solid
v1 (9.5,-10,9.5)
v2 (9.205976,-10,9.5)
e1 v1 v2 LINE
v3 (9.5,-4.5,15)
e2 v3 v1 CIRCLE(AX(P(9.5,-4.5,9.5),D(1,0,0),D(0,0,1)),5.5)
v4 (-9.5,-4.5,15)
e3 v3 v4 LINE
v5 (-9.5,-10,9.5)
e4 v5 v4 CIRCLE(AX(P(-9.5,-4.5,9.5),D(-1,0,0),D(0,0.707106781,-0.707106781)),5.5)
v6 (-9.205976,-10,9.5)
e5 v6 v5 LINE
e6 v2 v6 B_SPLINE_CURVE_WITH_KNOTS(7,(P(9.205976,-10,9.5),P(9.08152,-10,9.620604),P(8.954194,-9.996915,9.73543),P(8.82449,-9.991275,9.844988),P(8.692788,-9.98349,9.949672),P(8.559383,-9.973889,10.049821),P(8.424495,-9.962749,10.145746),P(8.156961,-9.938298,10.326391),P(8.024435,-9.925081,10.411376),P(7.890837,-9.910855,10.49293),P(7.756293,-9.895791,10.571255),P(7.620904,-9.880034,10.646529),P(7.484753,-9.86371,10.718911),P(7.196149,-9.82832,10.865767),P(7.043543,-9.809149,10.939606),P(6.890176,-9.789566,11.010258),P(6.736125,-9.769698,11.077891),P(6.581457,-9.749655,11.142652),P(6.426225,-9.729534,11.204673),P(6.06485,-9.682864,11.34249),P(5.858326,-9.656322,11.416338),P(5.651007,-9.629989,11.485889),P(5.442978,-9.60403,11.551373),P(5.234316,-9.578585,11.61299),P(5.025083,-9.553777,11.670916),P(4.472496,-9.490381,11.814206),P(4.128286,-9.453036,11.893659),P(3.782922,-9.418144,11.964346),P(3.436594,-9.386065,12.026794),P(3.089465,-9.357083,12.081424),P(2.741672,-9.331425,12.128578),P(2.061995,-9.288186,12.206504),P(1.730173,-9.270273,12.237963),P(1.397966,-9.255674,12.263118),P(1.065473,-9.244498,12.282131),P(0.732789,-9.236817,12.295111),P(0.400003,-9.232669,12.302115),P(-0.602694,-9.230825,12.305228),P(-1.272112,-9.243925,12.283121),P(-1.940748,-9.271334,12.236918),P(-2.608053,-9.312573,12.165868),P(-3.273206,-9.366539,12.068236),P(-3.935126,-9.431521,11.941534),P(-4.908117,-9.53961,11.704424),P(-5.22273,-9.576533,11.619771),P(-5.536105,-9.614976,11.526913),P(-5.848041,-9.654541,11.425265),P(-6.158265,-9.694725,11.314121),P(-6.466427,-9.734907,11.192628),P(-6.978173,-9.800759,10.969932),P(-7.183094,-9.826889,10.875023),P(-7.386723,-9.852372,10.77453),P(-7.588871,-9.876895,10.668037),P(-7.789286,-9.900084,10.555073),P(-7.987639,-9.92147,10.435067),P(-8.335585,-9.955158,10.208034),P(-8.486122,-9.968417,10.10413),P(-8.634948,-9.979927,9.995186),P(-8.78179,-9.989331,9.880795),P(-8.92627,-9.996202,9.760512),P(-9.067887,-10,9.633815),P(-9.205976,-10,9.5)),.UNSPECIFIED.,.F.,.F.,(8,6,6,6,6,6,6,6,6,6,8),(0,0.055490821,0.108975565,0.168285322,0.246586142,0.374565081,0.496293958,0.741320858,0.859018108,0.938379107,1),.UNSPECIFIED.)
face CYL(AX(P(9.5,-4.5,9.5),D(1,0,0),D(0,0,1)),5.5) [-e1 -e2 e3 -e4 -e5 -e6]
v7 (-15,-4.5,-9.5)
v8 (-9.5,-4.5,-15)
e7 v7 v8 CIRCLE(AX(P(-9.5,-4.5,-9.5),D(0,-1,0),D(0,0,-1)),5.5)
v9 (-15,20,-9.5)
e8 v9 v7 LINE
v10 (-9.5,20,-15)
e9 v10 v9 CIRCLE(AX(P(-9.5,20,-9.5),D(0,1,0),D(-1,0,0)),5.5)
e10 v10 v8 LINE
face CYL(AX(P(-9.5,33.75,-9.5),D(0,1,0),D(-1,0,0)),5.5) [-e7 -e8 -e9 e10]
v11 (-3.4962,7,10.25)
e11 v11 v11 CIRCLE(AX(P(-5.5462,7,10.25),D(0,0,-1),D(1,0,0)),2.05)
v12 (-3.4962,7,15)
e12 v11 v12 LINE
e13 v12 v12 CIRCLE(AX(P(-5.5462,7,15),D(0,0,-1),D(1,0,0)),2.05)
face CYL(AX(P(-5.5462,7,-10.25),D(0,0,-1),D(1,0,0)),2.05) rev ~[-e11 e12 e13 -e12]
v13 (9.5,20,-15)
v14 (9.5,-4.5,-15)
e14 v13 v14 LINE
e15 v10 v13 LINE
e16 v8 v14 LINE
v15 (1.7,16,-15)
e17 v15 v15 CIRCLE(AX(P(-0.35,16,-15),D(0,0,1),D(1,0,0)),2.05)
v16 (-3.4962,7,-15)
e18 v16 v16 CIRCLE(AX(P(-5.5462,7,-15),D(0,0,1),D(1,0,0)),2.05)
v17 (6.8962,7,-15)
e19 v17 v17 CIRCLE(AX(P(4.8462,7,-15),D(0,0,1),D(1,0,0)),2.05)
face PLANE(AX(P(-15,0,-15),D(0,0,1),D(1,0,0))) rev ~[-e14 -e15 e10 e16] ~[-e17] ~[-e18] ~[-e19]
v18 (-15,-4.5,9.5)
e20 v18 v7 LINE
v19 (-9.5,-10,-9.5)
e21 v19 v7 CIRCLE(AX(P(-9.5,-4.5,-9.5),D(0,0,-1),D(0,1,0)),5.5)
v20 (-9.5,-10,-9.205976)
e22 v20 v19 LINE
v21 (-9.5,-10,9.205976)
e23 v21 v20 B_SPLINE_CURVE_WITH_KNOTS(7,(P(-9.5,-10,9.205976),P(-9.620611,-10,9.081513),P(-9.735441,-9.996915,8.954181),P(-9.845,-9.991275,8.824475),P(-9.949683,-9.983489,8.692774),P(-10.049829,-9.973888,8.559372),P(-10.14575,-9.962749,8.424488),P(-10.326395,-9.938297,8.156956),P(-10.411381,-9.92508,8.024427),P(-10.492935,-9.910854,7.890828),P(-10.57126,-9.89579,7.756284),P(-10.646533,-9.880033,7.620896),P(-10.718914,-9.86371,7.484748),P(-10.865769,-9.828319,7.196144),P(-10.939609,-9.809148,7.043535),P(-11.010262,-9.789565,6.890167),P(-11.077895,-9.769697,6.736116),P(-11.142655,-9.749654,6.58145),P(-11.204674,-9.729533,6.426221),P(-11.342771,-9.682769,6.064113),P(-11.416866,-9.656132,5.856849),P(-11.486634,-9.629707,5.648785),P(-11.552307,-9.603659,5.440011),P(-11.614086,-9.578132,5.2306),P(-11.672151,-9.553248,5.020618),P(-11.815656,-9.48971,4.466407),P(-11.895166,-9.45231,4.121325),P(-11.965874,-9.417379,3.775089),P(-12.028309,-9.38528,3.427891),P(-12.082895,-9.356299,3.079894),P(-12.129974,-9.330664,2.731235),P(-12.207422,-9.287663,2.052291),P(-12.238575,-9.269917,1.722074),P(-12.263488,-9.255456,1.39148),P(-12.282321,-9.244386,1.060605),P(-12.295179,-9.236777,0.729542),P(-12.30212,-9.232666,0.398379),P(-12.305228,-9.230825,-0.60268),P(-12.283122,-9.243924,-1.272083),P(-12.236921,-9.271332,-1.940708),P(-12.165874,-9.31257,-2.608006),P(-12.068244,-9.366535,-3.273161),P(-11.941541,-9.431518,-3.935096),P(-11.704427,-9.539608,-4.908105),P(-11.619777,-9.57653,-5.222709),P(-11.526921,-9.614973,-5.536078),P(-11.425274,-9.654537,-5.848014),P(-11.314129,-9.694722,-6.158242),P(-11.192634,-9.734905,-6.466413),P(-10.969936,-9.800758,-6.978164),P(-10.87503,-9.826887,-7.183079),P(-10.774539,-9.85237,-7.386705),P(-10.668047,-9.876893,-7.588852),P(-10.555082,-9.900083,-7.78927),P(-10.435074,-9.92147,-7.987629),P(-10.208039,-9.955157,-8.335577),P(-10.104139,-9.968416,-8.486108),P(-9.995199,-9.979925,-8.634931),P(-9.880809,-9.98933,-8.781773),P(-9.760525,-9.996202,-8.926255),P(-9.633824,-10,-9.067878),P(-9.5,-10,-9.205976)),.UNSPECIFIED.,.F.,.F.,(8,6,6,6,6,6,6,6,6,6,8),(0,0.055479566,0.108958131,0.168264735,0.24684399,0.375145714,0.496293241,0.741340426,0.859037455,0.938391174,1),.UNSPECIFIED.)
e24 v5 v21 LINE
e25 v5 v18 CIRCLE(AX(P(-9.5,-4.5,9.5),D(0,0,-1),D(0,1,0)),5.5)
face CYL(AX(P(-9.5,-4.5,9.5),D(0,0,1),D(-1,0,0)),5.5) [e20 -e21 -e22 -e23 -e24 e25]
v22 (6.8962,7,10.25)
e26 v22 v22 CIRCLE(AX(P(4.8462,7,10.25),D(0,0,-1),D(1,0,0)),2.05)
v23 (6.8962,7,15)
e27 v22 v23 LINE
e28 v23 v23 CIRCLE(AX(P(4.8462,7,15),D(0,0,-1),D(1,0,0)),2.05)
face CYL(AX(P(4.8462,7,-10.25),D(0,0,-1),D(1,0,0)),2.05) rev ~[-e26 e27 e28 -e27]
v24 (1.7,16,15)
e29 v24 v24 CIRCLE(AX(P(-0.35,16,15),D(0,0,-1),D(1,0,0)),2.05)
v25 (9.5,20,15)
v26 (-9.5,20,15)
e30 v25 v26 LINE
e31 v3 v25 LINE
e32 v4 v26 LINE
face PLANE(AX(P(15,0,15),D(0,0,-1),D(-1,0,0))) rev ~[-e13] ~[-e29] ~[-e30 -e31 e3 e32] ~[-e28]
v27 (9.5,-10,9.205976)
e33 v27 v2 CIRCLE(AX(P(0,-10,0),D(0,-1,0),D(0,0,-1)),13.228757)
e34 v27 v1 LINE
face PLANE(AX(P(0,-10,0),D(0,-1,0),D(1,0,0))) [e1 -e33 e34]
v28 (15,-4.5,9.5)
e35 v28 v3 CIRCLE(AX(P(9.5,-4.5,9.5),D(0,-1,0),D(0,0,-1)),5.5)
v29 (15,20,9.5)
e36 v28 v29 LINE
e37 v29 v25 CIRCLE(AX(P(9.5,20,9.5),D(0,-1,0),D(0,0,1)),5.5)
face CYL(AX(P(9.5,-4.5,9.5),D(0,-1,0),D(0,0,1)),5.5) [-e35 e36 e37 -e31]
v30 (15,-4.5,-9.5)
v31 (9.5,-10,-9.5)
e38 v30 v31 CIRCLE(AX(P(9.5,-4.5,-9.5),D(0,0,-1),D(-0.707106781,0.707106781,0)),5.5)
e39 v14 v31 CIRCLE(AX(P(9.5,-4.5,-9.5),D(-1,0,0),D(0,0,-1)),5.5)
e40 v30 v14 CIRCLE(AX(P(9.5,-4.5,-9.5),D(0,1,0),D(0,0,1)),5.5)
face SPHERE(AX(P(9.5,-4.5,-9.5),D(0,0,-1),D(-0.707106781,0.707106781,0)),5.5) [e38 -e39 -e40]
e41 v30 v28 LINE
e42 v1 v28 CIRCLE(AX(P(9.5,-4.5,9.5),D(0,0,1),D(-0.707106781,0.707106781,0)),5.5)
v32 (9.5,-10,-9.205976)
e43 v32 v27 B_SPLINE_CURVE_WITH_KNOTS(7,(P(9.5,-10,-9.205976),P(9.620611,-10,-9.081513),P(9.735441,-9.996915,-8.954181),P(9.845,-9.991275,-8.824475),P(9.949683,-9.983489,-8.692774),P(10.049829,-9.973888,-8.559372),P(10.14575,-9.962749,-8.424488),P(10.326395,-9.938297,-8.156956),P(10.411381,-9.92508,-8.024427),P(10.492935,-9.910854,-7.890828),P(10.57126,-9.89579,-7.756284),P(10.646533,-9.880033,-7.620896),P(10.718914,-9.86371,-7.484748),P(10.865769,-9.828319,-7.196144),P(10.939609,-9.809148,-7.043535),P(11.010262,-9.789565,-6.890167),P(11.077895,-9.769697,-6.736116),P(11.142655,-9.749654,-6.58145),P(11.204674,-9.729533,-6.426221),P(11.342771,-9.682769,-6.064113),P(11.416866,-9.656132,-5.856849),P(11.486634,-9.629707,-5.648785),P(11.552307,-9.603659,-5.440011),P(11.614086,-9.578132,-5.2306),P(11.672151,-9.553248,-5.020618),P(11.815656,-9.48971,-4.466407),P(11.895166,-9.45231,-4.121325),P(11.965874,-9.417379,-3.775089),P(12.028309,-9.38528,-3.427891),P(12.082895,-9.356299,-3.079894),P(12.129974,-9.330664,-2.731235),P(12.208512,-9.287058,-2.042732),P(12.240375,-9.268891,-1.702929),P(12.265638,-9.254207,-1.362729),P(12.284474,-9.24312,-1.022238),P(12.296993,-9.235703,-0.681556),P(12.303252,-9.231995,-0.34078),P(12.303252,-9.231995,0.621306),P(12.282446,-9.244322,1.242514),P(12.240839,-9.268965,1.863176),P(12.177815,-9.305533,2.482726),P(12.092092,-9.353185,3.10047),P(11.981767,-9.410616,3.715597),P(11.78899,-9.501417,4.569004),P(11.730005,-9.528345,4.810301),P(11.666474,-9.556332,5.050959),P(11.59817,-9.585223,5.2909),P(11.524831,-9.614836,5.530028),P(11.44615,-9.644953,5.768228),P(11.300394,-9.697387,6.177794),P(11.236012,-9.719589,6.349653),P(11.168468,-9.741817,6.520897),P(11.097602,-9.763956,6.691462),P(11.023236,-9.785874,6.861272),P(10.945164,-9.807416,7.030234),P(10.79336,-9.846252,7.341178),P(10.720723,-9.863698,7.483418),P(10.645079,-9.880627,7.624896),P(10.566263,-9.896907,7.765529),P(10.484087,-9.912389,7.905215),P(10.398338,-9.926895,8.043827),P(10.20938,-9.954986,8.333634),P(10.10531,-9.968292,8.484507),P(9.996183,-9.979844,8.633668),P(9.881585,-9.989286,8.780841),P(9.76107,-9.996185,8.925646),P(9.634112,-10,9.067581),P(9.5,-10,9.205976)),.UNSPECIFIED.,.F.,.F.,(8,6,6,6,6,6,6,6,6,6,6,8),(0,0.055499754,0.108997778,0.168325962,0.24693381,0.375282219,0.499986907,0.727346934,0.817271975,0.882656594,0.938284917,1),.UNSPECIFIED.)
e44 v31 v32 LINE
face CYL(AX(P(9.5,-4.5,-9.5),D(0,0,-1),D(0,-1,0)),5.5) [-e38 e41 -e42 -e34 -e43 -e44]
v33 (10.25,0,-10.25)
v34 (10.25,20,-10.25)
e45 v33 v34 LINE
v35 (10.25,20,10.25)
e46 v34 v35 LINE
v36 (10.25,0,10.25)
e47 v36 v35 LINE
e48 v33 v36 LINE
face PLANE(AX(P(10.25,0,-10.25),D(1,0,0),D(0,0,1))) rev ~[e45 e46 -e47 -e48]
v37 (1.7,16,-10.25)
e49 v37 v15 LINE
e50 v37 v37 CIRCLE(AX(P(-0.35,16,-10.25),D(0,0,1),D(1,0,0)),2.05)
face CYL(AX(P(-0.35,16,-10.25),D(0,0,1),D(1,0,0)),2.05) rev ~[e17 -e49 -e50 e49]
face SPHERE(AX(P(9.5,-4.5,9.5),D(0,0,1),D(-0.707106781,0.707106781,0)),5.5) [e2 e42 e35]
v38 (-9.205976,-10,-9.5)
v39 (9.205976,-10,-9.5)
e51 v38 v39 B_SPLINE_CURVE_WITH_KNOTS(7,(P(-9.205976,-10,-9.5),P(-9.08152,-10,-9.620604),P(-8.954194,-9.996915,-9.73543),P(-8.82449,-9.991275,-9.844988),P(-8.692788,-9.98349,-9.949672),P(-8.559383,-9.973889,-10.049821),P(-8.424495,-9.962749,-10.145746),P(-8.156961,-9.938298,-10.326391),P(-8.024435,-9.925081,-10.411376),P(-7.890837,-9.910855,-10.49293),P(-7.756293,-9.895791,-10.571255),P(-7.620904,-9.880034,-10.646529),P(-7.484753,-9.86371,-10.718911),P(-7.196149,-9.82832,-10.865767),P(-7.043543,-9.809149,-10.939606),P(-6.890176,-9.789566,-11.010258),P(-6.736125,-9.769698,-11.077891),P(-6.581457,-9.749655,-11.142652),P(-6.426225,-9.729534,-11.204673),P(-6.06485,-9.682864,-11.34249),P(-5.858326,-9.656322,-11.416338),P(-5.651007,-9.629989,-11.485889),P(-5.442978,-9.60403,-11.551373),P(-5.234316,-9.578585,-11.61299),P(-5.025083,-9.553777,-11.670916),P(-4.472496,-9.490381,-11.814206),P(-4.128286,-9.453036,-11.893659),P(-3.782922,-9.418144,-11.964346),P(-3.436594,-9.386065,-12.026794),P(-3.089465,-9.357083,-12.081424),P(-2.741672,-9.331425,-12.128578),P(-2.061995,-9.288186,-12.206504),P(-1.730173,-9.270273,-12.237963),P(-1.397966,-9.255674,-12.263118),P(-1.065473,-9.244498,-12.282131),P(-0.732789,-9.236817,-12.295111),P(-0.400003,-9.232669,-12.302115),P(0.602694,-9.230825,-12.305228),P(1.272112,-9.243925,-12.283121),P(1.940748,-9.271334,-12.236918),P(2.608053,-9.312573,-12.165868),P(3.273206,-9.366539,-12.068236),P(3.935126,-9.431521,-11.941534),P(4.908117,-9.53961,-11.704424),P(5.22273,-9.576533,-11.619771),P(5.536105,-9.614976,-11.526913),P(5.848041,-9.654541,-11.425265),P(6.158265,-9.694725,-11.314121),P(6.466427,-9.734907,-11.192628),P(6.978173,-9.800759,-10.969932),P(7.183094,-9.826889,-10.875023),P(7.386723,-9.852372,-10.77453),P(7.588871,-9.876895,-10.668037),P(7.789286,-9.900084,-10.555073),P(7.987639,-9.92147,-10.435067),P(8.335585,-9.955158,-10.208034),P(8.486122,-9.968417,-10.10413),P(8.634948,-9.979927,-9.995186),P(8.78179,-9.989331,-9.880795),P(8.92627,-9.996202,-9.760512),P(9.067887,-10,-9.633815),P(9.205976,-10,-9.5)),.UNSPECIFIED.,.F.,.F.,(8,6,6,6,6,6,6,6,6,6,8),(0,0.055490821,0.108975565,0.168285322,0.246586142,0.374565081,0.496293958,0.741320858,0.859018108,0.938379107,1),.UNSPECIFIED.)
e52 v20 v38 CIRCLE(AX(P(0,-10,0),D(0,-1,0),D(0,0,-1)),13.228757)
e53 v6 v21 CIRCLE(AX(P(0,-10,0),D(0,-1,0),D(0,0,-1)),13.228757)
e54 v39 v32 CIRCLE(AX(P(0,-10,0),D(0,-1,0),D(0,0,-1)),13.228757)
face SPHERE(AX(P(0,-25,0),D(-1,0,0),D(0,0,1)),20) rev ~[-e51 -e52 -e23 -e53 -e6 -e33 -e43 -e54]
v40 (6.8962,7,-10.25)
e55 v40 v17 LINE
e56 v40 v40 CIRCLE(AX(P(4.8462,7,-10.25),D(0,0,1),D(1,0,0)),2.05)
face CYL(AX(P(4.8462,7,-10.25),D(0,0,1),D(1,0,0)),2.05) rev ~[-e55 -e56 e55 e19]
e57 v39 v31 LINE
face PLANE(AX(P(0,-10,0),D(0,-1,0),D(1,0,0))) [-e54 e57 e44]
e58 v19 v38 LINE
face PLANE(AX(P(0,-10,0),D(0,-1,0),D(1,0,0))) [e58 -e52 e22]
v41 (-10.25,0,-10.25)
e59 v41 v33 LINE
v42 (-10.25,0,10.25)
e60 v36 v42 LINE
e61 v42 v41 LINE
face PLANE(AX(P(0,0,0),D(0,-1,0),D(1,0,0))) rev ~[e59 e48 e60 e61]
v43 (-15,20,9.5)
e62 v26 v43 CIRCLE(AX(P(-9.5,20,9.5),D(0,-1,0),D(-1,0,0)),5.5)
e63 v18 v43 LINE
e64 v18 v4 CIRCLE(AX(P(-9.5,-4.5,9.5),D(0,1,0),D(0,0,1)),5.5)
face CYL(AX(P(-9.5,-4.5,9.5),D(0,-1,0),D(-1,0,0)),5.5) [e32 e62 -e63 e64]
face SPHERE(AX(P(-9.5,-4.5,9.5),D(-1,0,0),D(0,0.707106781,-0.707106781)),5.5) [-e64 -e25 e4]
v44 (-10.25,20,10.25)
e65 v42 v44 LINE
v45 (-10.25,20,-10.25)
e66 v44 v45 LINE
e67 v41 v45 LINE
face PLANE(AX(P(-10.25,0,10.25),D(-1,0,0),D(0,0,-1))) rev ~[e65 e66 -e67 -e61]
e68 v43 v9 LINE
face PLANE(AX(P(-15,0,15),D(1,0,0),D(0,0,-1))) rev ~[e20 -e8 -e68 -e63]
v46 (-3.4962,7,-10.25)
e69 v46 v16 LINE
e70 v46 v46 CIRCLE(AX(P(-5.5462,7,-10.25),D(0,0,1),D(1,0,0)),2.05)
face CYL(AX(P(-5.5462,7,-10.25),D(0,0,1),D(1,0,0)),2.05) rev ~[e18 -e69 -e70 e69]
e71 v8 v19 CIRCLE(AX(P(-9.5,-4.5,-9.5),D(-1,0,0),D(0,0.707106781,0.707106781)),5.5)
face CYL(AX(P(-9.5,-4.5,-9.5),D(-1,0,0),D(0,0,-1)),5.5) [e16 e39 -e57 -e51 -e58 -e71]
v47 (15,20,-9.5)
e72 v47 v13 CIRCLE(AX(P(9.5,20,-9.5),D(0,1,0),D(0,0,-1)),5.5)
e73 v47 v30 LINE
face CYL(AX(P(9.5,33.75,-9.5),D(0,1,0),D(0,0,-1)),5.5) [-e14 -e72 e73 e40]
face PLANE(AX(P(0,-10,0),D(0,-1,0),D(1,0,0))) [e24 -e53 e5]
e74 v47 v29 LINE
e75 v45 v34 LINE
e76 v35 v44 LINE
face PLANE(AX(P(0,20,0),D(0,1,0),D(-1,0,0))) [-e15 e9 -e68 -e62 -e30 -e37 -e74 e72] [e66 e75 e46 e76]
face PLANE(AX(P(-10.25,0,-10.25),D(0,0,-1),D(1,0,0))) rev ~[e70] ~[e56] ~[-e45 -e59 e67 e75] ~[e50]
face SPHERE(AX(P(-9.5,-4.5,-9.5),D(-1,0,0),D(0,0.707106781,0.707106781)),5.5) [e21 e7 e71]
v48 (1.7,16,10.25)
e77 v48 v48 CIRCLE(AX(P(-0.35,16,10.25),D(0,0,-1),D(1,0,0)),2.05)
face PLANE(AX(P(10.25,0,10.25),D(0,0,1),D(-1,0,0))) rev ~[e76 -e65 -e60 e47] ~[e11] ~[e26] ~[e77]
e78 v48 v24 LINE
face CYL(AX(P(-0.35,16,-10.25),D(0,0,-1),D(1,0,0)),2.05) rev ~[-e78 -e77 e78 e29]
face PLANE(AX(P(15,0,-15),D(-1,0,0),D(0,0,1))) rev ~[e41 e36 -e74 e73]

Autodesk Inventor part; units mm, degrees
ref_plane "YZ Plane" through (0, 0, 0) normal (1, 0, 0) x (0, 1, 0)
ref_plane "XZ Plane" through (0, 0, 0) normal (0, 1, 0) x (-1, 0, 0)
ref_plane "XY Plane" through (0, 0, 0) normal (0, 0, 1) x (1, 0, 0)
sketch "Sketch2" plane through (0, 0, 0) normal (0, 1, 0) x (-1, 0, 0)
  line L0 (-10.25, 10.25) -> (10.25, 10.25)
  line L1 (10.25, 10.25) -> (10.25, -10.25)
  line L2 (10.25, -10.25) -> (-10.25, -10.25)
  line L3 (-10.25, -10.25) -> (-10.25, 10.25)
  line L4 (-10.25, 10.25) -> (10.25, -10.25) construction
  line L5 (10.25, 10.25) -> (-10.25, -10.25) construction
  line L6 (-15, 15) -> (15, 15)
  line L7 (15, 15) -> (15, -15)
  line L8 (15, -15) -> (-15, -15)
  line L9 (-15, -15) -> (-15, 15)
  line L10 (-15, 15) -> (15, -15) construction
  line L11 (15, 15) -> (-15, -15) construction
  point P0 (0, 0)
  dimension "d2" = 20.5
  dimension "d3" = 20.5
  dimension "d4" = 30
  dimension "d5" = 30
extrude "Extrusion1" add sketch "Sketch2" along normal blind 20
sketch "Sketch3" plane through (-10.25, 0, -10.25) normal (0, 0, 1) x (1, 0, 0)
  circle A0 centre (9.9, 16) radius 2.05
  circle A1 centre (4.7038, 7) radius 2.05
  circle A2 centre (15.0962, 7) radius 2.05
  point P0 (10.25, 0)
  point P1 (9.9, 10)
  dimension "d8" = 4.1
  dimension "d9" = 6
  dimension "d12" = 360
extrude "Extrusion2" cut sketch "Sketch3" along normal through all both and the other way through all
sketch "Sketch4" plane through (0, 0, 0) normal (0, -1, 0) x (1, 0, 0)
  line L0 (-15, -15) -> (15, -15)
  line L1 (15, -15) -> (15, 15)
  line L2 (15, 15) -> (-15, 15)
  line L3 (-15, 15) -> (-15, -15)
  line L4 (-15, -15) -> (15, 15) construction
  line L5 (15, -15) -> (-15, 15) construction
  point P0 (0, 0)
  dimension "d16" = 30
  dimension "d17" = 30
extrude "Extrusion3" add sketch "Sketch4" along normal blind 25
sketch "Sketch5" plane through (0, -25, 0) normal (0, -1, 0) x (1, 0, 0)
  circle A0 centre (0, 0) radius 20
  line L0 (-20, 0) -> (20, 0)
  dimension "d20" = 40
revolve "Revolution1" cut sketch "Sketch5" angle 360 about axis through (-20, -25, 0) along (1, 0, 0) picked at (4.9901, 4.4208) contours L0 A0
sketch "Sketch6" plane through (0, -25, 0) normal (0, -1, 0) x (1, 0, 0)
  line L0 (-22.5, 22.5) -> (22.5, 22.5)
  line L1 (22.5, 22.5) -> (22.5, -22.5)
  line L2 (22.5, -22.5) -> (-22.5, -22.5)
  line L3 (-22.5, -22.5) -> (-22.5, 22.5)
  line L4 (-22.5, 22.5) -> (22.5, -22.5) construction
  line L5 (22.5, 22.5) -> (-22.5, -22.5) construction
  point P0 (0, 0)
  dimension "d23" = 45
  dimension "d24" = 45
extrude "Extrusion4" cut sketch "Sketch6" against normal blind 15
fillet "Fillet2" radius 5.5 8 edges at (0, -10, 15) (15, -10, 0) (0, -10, -15) (-15, -10, 0) (15, 5, -15) (-15, 5, -15) (-15, 5, 15) (15, 5, 15)
equation "\"d2\" = tool_mount_side + clearance"
equation "\"d3\" = tool_mount_side + clearance"
equation "\"d6\" = tool_mount_depth"
equation "\"tool_mount_side\" = 20"
equation "\"clearance\" = 0.5"
equation "\"tool_mount_depth\" = 20"
properties part number "tool_shoe"
